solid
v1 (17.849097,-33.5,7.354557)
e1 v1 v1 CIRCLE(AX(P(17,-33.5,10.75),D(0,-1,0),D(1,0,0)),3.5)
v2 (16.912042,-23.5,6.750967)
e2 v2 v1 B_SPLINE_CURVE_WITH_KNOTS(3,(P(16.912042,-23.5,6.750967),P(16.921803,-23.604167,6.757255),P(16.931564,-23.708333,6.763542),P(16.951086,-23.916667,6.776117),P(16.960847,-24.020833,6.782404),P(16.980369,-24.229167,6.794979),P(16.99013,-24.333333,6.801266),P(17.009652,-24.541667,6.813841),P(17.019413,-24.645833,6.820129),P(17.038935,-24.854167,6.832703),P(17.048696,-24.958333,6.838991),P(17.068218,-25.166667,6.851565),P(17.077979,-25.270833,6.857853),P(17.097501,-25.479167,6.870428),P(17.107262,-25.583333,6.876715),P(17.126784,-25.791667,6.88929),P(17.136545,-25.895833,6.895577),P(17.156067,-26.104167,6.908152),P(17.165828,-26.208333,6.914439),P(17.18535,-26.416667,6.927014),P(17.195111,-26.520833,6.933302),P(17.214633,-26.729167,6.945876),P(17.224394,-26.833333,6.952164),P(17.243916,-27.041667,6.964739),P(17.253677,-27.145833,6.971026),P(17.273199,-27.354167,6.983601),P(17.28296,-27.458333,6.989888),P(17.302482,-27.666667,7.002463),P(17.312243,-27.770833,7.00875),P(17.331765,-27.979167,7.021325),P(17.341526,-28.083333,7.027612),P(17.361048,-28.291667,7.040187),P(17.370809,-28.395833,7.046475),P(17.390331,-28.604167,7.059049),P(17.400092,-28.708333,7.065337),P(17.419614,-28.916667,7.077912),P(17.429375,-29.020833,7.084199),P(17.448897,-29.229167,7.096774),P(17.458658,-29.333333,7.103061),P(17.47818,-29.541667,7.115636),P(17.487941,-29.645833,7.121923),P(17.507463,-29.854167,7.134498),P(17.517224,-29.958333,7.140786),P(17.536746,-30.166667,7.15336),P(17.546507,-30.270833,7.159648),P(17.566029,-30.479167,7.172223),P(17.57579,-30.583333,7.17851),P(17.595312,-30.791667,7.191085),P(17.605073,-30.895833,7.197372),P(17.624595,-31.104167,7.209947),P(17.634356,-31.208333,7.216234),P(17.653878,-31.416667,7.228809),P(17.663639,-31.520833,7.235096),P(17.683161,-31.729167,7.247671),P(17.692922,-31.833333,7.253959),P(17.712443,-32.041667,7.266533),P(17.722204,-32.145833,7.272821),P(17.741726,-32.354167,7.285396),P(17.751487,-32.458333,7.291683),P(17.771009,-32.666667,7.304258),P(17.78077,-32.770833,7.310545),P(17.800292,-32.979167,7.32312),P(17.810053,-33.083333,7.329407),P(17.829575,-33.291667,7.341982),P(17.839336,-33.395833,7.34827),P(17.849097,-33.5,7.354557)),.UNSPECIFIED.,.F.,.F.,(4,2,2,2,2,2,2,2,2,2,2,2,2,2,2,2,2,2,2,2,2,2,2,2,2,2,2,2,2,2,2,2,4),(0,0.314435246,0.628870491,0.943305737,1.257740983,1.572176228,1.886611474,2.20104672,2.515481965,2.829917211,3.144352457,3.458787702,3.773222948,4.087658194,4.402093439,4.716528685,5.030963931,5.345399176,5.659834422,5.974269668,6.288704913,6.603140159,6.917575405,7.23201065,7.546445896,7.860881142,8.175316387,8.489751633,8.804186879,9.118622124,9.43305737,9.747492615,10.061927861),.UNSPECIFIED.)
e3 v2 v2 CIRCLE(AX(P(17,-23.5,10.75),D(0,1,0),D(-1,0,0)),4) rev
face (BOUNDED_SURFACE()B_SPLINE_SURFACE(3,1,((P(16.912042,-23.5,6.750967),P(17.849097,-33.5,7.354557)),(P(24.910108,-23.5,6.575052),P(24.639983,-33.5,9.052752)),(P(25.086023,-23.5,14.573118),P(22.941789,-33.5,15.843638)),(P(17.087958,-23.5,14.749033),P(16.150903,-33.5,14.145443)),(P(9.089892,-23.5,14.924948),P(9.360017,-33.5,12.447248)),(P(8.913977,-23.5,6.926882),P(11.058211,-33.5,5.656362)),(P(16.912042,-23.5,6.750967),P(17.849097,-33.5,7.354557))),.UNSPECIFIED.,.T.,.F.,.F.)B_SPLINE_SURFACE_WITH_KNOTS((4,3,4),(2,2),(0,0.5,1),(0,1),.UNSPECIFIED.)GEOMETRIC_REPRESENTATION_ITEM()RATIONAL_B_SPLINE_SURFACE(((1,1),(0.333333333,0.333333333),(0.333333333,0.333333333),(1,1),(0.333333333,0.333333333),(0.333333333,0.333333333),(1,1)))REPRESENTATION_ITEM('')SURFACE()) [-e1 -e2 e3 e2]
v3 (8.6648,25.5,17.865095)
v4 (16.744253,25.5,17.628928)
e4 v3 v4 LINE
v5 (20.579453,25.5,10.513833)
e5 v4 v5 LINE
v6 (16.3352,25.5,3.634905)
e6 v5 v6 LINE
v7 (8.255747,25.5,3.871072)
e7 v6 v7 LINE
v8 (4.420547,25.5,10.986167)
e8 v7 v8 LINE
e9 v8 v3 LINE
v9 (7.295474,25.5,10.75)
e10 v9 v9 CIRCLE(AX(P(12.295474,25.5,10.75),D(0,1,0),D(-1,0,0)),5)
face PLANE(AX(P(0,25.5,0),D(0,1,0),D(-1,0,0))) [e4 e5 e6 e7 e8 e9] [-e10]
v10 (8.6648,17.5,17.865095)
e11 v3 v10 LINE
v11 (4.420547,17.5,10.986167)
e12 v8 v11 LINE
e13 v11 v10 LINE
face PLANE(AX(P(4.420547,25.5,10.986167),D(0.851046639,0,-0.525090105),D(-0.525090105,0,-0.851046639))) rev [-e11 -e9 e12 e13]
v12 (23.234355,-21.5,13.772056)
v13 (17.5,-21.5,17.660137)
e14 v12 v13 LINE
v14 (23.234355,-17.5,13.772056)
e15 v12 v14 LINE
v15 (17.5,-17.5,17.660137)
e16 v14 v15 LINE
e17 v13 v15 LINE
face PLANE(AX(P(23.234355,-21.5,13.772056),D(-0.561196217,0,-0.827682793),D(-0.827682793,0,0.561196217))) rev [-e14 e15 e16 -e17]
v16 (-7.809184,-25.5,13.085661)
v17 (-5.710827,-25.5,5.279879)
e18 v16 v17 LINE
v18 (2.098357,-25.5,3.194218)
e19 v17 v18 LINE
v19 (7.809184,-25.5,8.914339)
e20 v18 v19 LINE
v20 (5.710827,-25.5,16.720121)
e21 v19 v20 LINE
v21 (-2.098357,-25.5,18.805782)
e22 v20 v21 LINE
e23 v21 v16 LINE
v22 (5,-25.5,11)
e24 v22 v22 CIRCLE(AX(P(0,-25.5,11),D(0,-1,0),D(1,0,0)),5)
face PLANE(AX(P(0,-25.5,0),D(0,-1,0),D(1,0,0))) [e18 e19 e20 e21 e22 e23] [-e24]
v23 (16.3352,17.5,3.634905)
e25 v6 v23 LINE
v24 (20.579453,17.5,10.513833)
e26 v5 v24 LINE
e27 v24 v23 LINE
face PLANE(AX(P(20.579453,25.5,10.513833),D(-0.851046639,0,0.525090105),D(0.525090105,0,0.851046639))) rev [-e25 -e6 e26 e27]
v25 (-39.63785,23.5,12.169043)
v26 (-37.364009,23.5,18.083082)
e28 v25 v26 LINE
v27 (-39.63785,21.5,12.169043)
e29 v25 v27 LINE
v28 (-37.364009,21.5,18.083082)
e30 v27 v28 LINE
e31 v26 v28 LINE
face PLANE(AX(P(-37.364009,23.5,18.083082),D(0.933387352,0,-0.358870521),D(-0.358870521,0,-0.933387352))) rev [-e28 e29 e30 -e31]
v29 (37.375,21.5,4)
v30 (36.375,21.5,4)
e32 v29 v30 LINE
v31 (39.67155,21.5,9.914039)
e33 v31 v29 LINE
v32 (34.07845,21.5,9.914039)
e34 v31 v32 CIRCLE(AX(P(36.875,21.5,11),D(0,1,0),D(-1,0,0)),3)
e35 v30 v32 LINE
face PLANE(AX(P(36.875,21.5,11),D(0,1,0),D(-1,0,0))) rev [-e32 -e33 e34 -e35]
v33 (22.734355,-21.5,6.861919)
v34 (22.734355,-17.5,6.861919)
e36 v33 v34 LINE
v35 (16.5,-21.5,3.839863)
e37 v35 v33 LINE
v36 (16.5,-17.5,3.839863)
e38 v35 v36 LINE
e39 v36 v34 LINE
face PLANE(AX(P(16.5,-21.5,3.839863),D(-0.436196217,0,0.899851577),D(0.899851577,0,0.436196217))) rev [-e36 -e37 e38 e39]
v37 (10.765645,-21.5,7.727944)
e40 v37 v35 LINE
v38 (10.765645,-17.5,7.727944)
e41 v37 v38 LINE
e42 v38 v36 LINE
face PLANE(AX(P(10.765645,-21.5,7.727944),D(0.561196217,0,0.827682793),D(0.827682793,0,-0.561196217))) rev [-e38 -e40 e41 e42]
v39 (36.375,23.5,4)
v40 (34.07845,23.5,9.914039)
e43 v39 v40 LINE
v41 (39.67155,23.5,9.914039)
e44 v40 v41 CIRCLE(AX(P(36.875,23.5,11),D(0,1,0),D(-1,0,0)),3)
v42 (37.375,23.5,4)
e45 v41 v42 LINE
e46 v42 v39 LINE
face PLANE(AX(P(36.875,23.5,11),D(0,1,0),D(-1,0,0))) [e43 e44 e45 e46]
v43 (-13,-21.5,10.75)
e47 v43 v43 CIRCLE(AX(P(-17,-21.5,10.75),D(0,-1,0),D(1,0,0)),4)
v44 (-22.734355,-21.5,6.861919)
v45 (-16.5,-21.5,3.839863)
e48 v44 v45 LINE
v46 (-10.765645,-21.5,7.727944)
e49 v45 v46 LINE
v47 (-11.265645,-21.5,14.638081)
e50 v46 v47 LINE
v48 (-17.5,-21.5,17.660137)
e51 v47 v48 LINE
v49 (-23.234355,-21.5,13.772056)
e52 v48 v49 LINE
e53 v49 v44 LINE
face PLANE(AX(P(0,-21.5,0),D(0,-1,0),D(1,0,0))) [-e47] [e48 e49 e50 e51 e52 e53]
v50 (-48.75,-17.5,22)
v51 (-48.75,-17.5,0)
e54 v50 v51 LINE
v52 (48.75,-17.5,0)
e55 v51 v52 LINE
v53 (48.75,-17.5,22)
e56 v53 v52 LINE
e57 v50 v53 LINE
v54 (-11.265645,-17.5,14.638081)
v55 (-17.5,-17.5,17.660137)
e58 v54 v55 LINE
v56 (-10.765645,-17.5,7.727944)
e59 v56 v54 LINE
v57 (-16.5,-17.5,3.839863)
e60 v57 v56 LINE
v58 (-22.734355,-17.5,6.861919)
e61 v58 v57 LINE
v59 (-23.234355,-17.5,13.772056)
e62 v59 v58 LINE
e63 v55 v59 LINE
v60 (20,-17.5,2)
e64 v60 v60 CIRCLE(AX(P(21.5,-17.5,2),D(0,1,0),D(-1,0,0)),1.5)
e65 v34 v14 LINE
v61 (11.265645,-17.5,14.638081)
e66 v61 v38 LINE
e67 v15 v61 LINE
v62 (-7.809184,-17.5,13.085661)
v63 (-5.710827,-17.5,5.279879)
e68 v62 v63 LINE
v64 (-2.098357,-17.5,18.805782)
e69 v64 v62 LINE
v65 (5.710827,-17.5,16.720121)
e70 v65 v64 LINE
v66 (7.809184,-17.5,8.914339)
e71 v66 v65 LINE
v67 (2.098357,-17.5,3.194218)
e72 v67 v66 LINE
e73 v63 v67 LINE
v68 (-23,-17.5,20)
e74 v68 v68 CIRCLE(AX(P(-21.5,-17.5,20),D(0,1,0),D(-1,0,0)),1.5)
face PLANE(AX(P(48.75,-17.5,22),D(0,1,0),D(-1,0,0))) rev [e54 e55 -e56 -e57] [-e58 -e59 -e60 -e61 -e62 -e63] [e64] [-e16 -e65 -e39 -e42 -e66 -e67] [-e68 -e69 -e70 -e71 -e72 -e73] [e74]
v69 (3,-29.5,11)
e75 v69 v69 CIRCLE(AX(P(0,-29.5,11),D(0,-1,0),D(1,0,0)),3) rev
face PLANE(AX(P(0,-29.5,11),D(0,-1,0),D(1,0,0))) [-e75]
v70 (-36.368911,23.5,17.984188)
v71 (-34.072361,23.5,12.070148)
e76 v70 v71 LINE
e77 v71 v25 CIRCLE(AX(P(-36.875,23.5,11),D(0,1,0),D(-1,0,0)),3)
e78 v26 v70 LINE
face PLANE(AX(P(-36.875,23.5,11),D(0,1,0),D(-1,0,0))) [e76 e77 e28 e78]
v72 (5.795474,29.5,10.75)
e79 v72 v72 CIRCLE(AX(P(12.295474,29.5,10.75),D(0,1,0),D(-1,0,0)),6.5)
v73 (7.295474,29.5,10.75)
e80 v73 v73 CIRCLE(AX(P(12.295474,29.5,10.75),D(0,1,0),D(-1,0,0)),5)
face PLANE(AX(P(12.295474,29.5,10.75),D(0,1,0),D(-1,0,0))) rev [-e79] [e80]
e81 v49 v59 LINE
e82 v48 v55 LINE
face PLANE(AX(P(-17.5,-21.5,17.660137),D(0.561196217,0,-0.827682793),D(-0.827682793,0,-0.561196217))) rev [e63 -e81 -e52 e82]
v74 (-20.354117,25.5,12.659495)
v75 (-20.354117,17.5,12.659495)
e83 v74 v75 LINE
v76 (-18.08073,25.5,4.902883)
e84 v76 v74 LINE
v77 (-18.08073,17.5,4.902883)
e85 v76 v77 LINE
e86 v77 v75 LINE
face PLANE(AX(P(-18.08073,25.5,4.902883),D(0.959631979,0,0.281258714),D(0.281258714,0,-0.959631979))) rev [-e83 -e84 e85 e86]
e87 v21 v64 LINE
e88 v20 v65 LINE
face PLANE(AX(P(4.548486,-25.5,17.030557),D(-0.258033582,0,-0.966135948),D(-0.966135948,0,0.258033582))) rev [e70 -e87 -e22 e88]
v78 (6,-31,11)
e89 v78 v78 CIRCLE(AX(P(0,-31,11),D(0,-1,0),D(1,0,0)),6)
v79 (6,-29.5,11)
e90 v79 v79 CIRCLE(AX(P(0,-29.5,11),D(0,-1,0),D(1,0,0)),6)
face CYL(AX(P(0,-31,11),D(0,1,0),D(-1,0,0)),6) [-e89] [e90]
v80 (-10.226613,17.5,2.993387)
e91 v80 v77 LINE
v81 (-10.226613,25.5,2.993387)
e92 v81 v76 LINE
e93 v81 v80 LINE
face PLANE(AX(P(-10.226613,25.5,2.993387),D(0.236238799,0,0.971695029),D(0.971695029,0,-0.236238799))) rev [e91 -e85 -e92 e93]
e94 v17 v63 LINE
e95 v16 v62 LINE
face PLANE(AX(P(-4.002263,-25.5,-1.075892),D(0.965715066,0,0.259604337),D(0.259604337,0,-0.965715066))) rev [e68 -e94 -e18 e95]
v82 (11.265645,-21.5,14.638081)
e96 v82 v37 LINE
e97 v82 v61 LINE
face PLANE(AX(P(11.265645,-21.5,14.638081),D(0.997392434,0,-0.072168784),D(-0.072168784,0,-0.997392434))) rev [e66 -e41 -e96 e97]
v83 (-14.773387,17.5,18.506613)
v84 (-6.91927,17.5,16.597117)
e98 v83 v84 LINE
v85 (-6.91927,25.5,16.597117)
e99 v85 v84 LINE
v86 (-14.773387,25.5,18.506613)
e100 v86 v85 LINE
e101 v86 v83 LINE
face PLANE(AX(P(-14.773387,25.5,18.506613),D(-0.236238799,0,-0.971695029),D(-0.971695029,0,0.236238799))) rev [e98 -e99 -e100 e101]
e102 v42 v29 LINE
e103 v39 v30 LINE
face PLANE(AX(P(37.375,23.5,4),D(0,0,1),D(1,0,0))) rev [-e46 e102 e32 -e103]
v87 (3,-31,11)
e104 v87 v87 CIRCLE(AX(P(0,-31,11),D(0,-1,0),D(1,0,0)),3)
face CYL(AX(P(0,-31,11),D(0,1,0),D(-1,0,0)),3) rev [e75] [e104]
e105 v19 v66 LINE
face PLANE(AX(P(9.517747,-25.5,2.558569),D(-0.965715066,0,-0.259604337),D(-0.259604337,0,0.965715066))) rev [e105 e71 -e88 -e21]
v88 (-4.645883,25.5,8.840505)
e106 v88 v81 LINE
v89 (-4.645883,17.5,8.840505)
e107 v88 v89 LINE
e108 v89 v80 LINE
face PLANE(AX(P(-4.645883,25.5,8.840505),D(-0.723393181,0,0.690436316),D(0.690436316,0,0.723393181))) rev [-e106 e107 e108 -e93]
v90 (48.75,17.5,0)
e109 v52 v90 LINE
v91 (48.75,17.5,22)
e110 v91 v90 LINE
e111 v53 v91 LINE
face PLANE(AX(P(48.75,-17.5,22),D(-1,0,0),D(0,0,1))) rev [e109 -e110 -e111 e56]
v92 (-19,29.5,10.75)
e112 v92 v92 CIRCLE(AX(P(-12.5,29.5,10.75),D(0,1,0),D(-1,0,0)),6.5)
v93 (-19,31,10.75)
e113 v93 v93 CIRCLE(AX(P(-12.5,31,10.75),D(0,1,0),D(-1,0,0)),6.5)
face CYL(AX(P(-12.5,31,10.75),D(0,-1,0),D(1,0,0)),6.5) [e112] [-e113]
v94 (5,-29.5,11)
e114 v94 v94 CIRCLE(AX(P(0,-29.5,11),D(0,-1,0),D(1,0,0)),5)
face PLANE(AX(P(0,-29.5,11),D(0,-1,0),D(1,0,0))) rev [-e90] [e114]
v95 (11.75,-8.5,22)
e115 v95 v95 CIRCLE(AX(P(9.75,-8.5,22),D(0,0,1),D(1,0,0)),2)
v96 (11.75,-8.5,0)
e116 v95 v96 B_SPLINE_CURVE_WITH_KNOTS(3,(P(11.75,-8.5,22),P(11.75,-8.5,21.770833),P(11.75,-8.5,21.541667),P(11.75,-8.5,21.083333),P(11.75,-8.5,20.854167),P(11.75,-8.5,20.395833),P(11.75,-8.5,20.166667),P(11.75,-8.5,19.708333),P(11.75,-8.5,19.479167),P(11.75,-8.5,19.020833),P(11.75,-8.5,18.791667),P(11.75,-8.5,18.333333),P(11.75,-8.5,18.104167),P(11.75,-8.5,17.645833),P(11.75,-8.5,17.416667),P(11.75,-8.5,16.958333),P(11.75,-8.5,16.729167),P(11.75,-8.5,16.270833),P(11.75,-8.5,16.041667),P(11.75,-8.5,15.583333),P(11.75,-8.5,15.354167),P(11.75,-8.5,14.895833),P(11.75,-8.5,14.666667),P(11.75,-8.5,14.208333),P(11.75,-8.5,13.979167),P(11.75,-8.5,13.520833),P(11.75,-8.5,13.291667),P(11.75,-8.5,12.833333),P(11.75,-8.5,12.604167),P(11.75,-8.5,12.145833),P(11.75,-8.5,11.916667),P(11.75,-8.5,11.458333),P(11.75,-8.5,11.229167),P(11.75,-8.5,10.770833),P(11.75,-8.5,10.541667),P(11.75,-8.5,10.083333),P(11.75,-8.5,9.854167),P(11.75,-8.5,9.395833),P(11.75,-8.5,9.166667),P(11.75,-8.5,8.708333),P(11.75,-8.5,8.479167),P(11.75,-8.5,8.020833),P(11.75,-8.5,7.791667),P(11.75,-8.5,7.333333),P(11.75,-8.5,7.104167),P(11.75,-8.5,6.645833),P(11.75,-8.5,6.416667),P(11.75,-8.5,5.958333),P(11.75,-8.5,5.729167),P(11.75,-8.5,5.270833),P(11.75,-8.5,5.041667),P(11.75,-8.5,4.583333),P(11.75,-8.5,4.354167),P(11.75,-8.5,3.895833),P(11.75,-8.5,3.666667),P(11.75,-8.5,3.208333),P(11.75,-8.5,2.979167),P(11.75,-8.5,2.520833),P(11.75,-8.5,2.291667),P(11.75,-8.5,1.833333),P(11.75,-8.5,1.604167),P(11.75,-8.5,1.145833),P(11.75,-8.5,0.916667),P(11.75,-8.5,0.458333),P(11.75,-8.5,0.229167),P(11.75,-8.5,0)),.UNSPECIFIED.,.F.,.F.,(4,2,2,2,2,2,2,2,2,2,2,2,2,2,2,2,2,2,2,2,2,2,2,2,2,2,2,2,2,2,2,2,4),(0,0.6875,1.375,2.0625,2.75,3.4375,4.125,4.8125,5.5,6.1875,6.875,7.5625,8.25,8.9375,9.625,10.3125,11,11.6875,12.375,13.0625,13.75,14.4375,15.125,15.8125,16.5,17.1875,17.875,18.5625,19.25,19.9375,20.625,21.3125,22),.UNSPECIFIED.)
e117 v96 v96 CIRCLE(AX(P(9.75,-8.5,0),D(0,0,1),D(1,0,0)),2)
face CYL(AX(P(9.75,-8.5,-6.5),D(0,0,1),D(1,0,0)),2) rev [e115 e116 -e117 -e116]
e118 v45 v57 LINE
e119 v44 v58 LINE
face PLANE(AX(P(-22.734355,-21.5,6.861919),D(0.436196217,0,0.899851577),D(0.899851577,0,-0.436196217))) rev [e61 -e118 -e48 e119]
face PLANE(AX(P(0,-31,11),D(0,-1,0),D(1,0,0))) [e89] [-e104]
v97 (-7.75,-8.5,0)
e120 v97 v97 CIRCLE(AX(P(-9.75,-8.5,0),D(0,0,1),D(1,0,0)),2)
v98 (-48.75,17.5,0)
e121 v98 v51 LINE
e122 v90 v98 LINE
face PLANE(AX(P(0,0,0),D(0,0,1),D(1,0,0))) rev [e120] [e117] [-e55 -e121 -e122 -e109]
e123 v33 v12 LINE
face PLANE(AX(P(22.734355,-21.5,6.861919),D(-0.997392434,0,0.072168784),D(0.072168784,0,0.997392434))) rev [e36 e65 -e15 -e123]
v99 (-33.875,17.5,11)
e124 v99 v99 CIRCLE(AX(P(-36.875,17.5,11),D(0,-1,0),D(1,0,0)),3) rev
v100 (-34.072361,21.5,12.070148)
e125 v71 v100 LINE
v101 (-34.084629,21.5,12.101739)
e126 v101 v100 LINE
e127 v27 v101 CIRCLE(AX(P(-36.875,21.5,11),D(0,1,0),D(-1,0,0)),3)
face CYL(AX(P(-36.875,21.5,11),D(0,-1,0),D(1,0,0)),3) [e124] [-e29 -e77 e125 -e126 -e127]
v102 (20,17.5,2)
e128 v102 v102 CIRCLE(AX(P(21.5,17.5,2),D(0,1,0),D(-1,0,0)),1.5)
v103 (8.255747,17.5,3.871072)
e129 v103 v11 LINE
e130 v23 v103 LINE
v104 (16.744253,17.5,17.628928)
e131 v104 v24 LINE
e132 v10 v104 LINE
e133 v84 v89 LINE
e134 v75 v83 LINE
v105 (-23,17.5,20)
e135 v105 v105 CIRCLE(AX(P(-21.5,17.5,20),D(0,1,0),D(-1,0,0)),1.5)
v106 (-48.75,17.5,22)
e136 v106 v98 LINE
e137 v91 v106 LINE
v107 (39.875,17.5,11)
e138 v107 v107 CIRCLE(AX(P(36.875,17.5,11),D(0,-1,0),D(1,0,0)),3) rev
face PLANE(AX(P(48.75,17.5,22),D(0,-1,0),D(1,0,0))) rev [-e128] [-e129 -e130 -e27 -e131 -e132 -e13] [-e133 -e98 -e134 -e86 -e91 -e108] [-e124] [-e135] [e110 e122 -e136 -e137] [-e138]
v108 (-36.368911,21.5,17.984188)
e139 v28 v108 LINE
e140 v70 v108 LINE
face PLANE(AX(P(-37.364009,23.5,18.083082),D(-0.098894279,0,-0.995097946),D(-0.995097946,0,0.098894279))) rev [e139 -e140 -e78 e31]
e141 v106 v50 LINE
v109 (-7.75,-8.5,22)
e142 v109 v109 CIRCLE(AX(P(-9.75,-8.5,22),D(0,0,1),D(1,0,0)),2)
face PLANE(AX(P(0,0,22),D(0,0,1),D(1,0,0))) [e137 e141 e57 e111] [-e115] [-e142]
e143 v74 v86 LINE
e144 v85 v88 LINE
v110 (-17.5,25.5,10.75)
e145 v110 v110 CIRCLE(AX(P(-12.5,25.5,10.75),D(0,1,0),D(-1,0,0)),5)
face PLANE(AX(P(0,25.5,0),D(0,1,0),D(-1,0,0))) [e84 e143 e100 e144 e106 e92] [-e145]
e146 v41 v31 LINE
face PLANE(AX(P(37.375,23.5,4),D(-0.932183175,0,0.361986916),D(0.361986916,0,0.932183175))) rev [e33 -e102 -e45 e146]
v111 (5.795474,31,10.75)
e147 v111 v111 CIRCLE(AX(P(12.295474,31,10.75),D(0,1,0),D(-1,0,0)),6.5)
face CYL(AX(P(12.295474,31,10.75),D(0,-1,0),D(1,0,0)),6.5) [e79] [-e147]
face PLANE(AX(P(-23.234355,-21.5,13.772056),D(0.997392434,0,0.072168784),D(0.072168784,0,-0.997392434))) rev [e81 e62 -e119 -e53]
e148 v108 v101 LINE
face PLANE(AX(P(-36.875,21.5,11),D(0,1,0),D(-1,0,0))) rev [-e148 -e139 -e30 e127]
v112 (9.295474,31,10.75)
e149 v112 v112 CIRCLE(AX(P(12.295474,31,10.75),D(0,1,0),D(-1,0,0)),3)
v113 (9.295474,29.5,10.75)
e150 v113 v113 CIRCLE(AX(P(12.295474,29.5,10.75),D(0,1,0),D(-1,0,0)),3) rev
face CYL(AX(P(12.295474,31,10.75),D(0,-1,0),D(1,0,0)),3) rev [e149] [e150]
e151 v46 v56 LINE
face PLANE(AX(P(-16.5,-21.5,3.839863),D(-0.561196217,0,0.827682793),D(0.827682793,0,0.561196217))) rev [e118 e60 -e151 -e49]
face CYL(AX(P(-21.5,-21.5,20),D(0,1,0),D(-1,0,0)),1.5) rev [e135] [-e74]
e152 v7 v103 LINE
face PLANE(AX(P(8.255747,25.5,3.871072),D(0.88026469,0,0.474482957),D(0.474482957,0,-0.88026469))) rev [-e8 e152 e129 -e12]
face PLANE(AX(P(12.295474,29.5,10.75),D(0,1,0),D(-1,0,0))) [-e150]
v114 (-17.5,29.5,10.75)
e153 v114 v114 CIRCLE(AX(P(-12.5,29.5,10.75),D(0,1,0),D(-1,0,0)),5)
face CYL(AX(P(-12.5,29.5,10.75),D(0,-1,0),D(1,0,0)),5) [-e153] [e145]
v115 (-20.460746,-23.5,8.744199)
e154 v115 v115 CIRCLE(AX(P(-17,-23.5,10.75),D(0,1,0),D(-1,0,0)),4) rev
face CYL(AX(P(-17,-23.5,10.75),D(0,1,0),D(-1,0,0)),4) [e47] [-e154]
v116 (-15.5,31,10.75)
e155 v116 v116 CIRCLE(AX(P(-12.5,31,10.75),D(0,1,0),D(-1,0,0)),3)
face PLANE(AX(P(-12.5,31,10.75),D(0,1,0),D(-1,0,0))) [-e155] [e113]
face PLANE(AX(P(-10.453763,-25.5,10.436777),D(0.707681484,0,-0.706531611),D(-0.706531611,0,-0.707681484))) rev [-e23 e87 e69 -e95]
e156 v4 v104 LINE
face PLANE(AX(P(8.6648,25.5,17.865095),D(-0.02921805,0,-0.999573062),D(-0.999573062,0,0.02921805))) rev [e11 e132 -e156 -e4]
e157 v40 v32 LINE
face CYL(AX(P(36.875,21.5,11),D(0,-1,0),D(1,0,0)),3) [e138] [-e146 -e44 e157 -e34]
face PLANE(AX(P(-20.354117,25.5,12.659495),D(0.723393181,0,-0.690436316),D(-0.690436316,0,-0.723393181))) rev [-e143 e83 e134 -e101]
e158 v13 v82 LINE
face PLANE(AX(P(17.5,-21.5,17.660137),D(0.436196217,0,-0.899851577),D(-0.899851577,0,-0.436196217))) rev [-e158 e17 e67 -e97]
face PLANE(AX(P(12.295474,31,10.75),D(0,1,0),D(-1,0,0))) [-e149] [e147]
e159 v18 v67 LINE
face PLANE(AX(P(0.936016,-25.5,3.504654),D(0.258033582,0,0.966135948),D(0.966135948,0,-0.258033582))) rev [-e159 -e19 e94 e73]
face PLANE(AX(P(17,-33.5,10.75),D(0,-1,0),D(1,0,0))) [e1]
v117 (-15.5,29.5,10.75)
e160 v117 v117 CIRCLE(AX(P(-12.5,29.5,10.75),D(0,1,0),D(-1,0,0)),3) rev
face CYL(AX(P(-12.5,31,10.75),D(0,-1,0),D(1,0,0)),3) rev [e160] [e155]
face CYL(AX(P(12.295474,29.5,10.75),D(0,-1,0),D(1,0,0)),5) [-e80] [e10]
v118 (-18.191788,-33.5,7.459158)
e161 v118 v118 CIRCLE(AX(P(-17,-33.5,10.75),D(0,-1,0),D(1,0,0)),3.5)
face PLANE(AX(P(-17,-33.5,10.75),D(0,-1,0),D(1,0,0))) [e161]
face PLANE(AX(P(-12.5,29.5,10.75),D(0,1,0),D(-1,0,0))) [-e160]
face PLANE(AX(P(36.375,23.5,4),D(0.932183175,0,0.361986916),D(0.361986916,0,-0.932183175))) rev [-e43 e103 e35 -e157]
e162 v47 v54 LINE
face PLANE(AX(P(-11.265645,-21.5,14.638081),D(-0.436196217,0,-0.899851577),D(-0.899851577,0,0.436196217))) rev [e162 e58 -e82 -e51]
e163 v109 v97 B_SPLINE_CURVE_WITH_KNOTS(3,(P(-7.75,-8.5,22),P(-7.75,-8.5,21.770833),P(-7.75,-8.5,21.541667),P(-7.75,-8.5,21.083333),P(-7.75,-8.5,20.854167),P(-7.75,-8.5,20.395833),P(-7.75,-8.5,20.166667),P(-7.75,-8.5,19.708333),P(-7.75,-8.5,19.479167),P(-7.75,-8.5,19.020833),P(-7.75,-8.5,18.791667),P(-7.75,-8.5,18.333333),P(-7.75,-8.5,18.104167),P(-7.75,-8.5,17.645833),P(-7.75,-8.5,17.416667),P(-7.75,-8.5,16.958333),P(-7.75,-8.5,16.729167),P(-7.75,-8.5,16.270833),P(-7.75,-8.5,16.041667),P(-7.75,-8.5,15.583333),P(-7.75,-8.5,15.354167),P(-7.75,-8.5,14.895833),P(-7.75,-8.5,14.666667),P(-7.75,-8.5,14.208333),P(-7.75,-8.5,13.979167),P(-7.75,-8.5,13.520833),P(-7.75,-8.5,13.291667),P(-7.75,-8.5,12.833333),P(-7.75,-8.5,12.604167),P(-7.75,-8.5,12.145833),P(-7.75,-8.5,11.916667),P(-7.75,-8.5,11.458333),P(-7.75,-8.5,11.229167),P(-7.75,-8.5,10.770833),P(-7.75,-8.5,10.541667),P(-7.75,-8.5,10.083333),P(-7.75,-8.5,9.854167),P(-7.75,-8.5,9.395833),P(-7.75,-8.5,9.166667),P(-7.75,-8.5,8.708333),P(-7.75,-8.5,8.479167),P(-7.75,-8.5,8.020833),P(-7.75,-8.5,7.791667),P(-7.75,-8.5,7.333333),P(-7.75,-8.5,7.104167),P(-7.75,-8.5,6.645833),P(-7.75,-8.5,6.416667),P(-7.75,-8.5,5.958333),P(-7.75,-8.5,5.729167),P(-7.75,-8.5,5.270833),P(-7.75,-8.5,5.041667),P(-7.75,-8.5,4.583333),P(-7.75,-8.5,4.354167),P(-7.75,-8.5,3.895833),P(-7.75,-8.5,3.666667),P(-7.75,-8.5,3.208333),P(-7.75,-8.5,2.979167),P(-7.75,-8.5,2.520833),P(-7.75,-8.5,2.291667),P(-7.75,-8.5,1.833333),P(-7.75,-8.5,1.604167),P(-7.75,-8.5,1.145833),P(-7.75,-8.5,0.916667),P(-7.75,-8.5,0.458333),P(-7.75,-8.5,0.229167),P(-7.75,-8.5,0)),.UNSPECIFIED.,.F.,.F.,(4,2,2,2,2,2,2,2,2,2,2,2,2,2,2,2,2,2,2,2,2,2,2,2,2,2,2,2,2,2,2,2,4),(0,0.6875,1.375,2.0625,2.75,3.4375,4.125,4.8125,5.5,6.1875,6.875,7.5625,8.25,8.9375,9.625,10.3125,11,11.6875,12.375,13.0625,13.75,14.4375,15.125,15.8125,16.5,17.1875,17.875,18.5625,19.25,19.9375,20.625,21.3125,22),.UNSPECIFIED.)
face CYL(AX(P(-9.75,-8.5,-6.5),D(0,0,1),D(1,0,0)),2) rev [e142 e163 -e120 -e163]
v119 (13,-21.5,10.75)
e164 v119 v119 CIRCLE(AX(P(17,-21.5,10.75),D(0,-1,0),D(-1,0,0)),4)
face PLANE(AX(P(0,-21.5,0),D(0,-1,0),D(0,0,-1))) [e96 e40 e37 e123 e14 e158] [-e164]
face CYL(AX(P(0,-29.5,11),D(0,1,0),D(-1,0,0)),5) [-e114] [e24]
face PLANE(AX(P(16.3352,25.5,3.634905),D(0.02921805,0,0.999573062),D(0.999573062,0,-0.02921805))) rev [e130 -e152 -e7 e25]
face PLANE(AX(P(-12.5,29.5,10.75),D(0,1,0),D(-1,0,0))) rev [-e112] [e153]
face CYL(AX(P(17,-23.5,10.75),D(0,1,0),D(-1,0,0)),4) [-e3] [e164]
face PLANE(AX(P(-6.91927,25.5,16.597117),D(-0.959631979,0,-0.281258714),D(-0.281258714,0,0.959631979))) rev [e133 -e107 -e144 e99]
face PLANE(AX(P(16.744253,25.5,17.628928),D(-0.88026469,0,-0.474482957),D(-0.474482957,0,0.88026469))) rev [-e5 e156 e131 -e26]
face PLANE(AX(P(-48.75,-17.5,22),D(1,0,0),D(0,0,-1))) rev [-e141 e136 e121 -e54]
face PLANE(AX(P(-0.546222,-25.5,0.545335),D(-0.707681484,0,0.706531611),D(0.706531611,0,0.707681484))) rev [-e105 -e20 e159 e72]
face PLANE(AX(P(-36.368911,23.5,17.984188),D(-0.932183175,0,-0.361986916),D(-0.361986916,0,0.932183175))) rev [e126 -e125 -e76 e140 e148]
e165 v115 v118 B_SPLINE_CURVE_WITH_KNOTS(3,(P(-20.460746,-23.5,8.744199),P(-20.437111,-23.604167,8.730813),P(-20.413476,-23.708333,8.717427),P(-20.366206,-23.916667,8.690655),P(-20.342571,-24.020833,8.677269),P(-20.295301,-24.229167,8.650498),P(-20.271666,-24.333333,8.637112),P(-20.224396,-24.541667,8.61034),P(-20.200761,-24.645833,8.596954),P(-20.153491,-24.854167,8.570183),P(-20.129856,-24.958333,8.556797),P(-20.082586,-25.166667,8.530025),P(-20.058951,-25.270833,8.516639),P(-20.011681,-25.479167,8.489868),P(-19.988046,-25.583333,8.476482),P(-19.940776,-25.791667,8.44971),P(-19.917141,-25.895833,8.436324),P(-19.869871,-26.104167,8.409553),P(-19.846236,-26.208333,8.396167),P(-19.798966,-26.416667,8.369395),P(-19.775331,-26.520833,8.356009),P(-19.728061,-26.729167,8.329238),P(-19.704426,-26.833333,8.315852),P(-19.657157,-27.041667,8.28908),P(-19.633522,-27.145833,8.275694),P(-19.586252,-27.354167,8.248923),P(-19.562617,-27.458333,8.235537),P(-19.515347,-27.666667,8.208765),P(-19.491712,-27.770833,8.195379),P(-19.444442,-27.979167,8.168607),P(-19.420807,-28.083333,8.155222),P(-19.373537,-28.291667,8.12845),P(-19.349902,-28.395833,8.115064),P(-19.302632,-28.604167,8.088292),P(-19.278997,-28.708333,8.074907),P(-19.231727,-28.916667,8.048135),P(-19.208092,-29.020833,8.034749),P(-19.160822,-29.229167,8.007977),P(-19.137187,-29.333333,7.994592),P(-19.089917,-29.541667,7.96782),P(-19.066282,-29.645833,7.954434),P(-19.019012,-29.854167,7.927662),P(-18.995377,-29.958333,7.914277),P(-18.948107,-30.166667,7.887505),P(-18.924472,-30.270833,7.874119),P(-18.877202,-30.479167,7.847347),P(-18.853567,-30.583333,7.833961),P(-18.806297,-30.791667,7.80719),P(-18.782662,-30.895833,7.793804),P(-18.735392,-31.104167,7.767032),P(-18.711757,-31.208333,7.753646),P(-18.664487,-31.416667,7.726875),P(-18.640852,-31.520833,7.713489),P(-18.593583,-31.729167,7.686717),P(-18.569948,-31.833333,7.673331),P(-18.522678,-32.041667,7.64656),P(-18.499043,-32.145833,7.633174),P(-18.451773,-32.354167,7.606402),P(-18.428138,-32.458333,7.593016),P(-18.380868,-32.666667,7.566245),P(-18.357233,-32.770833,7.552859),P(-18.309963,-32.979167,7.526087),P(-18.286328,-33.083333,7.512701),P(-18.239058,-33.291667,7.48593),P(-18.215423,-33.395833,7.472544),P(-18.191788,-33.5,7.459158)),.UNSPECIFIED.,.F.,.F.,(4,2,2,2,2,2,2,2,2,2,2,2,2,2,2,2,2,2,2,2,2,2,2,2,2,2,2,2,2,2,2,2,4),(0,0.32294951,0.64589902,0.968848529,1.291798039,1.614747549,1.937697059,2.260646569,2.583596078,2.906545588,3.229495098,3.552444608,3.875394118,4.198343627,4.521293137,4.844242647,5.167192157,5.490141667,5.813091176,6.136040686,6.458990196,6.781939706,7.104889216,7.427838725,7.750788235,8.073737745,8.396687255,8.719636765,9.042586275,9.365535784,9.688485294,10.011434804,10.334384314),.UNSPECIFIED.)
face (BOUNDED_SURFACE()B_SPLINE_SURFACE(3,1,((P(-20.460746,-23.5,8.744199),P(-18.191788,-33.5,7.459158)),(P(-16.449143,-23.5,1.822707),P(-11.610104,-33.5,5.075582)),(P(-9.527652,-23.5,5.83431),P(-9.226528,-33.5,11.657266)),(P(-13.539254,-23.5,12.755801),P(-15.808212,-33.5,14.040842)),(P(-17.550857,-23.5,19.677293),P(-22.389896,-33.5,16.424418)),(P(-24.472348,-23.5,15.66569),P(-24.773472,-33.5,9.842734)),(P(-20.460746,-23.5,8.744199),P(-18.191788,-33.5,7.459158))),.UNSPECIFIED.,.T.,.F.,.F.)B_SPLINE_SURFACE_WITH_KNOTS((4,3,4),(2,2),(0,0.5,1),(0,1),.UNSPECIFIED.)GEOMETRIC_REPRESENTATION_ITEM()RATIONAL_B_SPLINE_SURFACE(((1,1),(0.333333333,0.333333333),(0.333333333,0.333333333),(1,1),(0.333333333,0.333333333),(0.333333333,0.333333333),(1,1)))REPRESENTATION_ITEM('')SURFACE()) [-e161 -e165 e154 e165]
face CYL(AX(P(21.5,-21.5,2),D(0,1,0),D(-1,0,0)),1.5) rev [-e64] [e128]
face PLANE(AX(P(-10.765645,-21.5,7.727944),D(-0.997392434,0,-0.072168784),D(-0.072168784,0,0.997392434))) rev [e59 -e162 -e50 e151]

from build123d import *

# Parameters (mm, degrees)
SKETCH1_W            = 97.5
SKETCH1_H            = 35
BOSS_EXTRUDE1_DEPTH  = 22
SKETCH2_R            = 3
BOSS_EXTRUDE2_DEPTH  = 4
BOSS_EXTRUDE3_DEPTH  = 2
BOSS_EXTRUDE4_DEPTH  = 8
SKETCH6_R            = 5
BOSS_EXTRUDE5_DEPTH  = 4
SKETCH7_R            = 6.5
SKETCH7_R_2          = 3
BOSS_EXTRUDE6_DEPTH  = 1.5
BOSS_EXTRUDE8_DEPTH  = 8
BOSS_EXTRUDE9_DEPTH  = 4
SKETCH14_R           = 4
BOSS_EXTRUDE10_DEPTH = 2
SKETCH20_R           = 5
BOSS_EXTRUDE11_DEPTH = 4
SKETCH21_R           = 6
SKETCH21_R_2         = 3
BOSS_EXTRUDE12_DEPTH = 1.5
SKETCH22_R           = 2
CUT_EXTRUDE1_DEPTH   = 28.5
SKETCH25_R           = 1.5
CUT_EXTRUDE3_DEPTH   = 39


with BuildPart() as part:
    # Sketch1 → Boss-Extrude1 (new body)
    with BuildSketch(Plane.XY):
        Rectangle(SKETCH1_W, SKETCH1_H)
    extrude(amount=BOSS_EXTRUDE1_DEPTH)

    # Sketch2 → Boss-Extrude2 (add)
    with BuildSketch(Plane(origin=(0, 17.5, 0), x_dir=(1, 0, 0), z_dir=(0, 1, 0))):
        with Locations((-36.875, -11)):
            Circle(SKETCH2_R)
        with Locations((36.875, -11)):
            Circle(SKETCH2_R)
    extrude(amount=BOSS_EXTRUDE2_DEPTH)

    # Sketch3 → Boss-Extrude3 (add)
    with BuildSketch(Plane(origin=(0, 21.5, 0), x_dir=(1, 0, 0), z_dir=(0, 1, 0))):
        with BuildLine():
            Line((37.375, -4), (36.375, -4))
            Line((36.375, -4), (34.078450474, -9.914039252))
            ThreePointArc((34.078450474, -9.914039252), (36.875, -14), (39.671549526, -9.914039252))
            Line((39.671549526, -9.914039252), (37.375, -4))
        make_face()
        with BuildLine():
            Line((-37.364008965, -18.083081838), (-36.368911019, -17.984187559))
            Line((-36.368911019, -17.984187559), (-34.072361493, -12.070148307))
            ThreePointArc((-34.072361493, -12.070148307), (-36.928299188, -8.000473505), (-39.637849875, -12.169042586))
            Line((-39.637849875, -12.169042586), (-37.364008965, -18.083081838))
        make_face()
    extrude(amount=BOSS_EXTRUDE3_DEPTH)

    # Sketch4 → Boss-Extrude4 (add)
    with BuildSketch(Plane(origin=(0, 17.5, 0), x_dir=(1, 0, 0), z_dir=(0, 1, 0))):
        Polygon((-18.080730298, -4.902882533), (-20.354117415, -12.659495476), (-14.773387117, -18.506612943), (-6.919269702, -16.597117467), (-4.645882585, -8.840504524), (-10.226612883, -2.993387057), align=None)
        Polygon((8.255747213, -3.871071914), (4.420547133, -10.98616669), (8.66479992, -17.865094776), (16.744252787, -17.628928086), (20.579452867, -10.51383331), (16.33520008, -3.634905224), align=None)
    extrude(amount=BOSS_EXTRUDE4_DEPTH)

    # Sketch6 → Boss-Extrude5 (add)
    with BuildSketch(Plane(origin=(0, 25.5, 0), x_dir=(1, 0, 0), z_dir=(0, 1, 0))):
        with Locations(Location((-12.5, -10.75, 0), (0, 0, 180))):
            Circle(SKETCH6_R)
        with Locations(Location((12.295473647, -10.75, 0), (0, 0, 180))):
            Circle(SKETCH6_R)
    extrude(amount=BOSS_EXTRUDE5_DEPTH)

    # Sketch7 → Boss-Extrude6 (add)
    # profile 1 of 2: a face of its own
    with BuildSketch(Plane(origin=(0, 29.5, 0), x_dir=(1, 0, 0), z_dir=(0, 1, 0))):
        with Locations(Location((-12.5, -10.75, 0), (0, 0, 180))):
            Circle(SKETCH7_R)
        with Locations(Location((-12.5, -10.75, 0), (0, 0, 180))):
            Circle(SKETCH7_R_2, mode=Mode.SUBTRACT)
    # profile 2 of 2: a face of its own
    with BuildSketch(Plane(origin=(0, 29.5, 0), x_dir=(1, 0, 0), z_dir=(0, 1, 0))):
        with Locations(Location((12.295473647, -10.75, 0), (0, 0, 180))):
            Circle(SKETCH7_R)
        with Locations(Location((12.295473647, -10.75, 0), (0, 0, 180))):
            Circle(SKETCH7_R_2, mode=Mode.SUBTRACT)
    extrude(amount=BOSS_EXTRUDE6_DEPTH)

    # Sketch9 → Boss-Extrude8 (add)
    with BuildSketch(Plane.XZ.offset(17.5)):
        Polygon((-7.809183897, 13.085660615), (-5.710827024, 5.27987867), (2.098356873, 3.194218055), (7.809183897, 8.914339385), (5.710827024, 16.72012133), (-2.098356873, 18.805781945), align=None)
    extrude(amount=BOSS_EXTRUDE8_DEPTH)

    # Sketch13 → Boss-Extrude9 (add)
    with BuildSketch(Plane.XZ.offset(17.5)):
        Polygon((-22.734354602, 6.861918558), (-16.5, 3.839862519), (-10.765645398, 7.727943962), (-11.265645398, 14.638081442), (-17.5, 17.660137481), (-23.234354602, 13.772056038), align=None)
        Polygon((17.5, 17.660137481), (11.265645398, 14.638081442), (10.765645398, 7.727943962), (16.5, 3.839862519), (22.734354602, 6.861918558), (23.234354602, 13.772056038), align=None)
    extrude(amount=BOSS_EXTRUDE9_DEPTH)

    # Sketch14 → Boss-Extrude10 (add)
    with BuildSketch(Plane.XZ.offset(21.5)):
        with Locations((-17, 10.75)):
            Circle(SKETCH14_R)
        with Locations(Location((17, 10.75, 0), (0, 0, 180))):
            Circle(SKETCH14_R)
    extrude(amount=BOSS_EXTRUDE10_DEPTH)

    # Loft1: read off the stored shape, not the designer's step
    # Loft1: loft between two sections, ruled curve by curve
    loft1_from = [
        Edge.make_bspline([(-20.460745722, -23.5, 8.744198652), (-16.449143026, -23.5, 1.822707208), (-9.527651582, -23.5, 5.834309904), (-13.539254278, -23.5, 12.755801348), (-17.550856974, -23.5, 19.677292792), (-24.472348418, -23.5, 15.665690096), (-20.460745722, -23.5, 8.744198652)], [0, 0, 0, 0, 0.5, 0.5, 0.5, 1, 1, 1, 1], 3, [1, 0.333333333, 0.333333333, 1, 0.333333333, 0.333333333, 1]),
    ]
    loft1_to = [
        Edge.make_bspline([(-18.191787926, -33.5, 7.459157928), (-11.610103782, -33.5, 5.075582077), (-9.226527931, -33.5, 11.65726622), (-15.808212074, -33.5, 14.040842072), (-22.389896218, -33.5, 16.424417923), (-24.773472069, -33.5, 9.84273378), (-18.191787926, -33.5, 7.459157928)], [0, 0, 0, 0, 0.5, 0.5, 0.5, 1, 1, 1, 1], 3, [1, 0.333333333, 0.333333333, 1, 0.333333333, 0.333333333, 1]),
    ]
    loft1 = Solid(Shell([*[Face.make_surface_from_curves(loft1_from[k], loft1_to[k]) for k in range(1)], Face(Wire(loft1_from)), Face(Wire(loft1_to))]))
    add(loft1)

    # Loft4: read off the stored shape, not the designer's step
    # Loft4: loft between two sections, ruled curve by curve
    loft4_from = [
        Edge.make_bspline([(16.912042496, -23.5, 6.750967182), (24.910108131, -23.5, 6.575052174), (25.08602314, -23.5, 14.573117809), (17.087957504, -23.5, 14.749032818), (9.089891869, -23.5, 14.924947826), (8.91397686, -23.5, 6.926882191), (16.912042496, -23.5, 6.750967182)], [0, 0, 0, 0, 0.5, 0.5, 0.5, 1, 1, 1, 1], 3, [1, 0.333333333, 0.333333333, 1, 0.333333333, 0.333333333, 1]),
    ]
    loft4_to = [
        Edge.make_bspline([(17.849097308, -33.5, 7.354556912), (24.639983483, -33.5, 9.052751528), (22.941788868, -33.5, 15.843637703), (16.150902692, -33.5, 14.145443088), (9.360016517, -33.5, 12.447248472), (11.058211132, -33.5, 5.656362297), (17.849097308, -33.5, 7.354556912)], [0, 0, 0, 0, 0.5, 0.5, 0.5, 1, 1, 1, 1], 3, [1, 0.333333333, 0.333333333, 1, 0.333333333, 0.333333333, 1]),
    ]
    loft4 = Solid(Shell([*[Face.make_surface_from_curves(loft4_from[k], loft4_to[k]) for k in range(1)], Face(Wire(loft4_from)), Face(Wire(loft4_to))]))
    add(loft4)

    # Sketch20 → Boss-Extrude11 (add)
    with BuildSketch(Plane.XZ.offset(25.5)):
        with Locations((0, 11)):
            Circle(SKETCH20_R)
    extrude(amount=BOSS_EXTRUDE11_DEPTH)

    # Sketch21 → Boss-Extrude12 (add)
    with BuildSketch(Plane(origin=(0, -29.5, 0), x_dir=(-1, 0, 0), z_dir=(0, -1, 0))):
        with Locations(Location((0, -11, 0), (0, 0, 180))):
            Circle(SKETCH21_R)
        with Locations(Location((0, -11, 0), (0, 0, 180))):
            Circle(SKETCH21_R_2, mode=Mode.SUBTRACT)
    extrude(amount=BOSS_EXTRUDE12_DEPTH)

    # Sketch22 → Cut-Extrude1 (cut)
    with BuildSketch(Plane.XY.offset(22)):
        with Locations((-9.75, -8.5)):
            Circle(SKETCH22_R)
        with Locations((9.75, -8.5)):
            Circle(SKETCH22_R)
    extrude(amount=-CUT_EXTRUDE1_DEPTH, mode=Mode.SUBTRACT)

    # Sketch25 → Cut-Extrude3 (cut)
    with BuildSketch(Plane(origin=(0, 17.5, 0), x_dir=(1, 0, 0), z_dir=(0, 1, 0))):
        with Locations(Location((-21.5, -20, 0), (0, 0, 180))):
            Circle(SKETCH25_R)
        with Locations(Location((21.5, -2, 0), (0, 0, 180))):
            Circle(SKETCH25_R)
    extrude(amount=-CUT_EXTRUDE3_DEPTH, mode=Mode.SUBTRACT)


solid = part.part
